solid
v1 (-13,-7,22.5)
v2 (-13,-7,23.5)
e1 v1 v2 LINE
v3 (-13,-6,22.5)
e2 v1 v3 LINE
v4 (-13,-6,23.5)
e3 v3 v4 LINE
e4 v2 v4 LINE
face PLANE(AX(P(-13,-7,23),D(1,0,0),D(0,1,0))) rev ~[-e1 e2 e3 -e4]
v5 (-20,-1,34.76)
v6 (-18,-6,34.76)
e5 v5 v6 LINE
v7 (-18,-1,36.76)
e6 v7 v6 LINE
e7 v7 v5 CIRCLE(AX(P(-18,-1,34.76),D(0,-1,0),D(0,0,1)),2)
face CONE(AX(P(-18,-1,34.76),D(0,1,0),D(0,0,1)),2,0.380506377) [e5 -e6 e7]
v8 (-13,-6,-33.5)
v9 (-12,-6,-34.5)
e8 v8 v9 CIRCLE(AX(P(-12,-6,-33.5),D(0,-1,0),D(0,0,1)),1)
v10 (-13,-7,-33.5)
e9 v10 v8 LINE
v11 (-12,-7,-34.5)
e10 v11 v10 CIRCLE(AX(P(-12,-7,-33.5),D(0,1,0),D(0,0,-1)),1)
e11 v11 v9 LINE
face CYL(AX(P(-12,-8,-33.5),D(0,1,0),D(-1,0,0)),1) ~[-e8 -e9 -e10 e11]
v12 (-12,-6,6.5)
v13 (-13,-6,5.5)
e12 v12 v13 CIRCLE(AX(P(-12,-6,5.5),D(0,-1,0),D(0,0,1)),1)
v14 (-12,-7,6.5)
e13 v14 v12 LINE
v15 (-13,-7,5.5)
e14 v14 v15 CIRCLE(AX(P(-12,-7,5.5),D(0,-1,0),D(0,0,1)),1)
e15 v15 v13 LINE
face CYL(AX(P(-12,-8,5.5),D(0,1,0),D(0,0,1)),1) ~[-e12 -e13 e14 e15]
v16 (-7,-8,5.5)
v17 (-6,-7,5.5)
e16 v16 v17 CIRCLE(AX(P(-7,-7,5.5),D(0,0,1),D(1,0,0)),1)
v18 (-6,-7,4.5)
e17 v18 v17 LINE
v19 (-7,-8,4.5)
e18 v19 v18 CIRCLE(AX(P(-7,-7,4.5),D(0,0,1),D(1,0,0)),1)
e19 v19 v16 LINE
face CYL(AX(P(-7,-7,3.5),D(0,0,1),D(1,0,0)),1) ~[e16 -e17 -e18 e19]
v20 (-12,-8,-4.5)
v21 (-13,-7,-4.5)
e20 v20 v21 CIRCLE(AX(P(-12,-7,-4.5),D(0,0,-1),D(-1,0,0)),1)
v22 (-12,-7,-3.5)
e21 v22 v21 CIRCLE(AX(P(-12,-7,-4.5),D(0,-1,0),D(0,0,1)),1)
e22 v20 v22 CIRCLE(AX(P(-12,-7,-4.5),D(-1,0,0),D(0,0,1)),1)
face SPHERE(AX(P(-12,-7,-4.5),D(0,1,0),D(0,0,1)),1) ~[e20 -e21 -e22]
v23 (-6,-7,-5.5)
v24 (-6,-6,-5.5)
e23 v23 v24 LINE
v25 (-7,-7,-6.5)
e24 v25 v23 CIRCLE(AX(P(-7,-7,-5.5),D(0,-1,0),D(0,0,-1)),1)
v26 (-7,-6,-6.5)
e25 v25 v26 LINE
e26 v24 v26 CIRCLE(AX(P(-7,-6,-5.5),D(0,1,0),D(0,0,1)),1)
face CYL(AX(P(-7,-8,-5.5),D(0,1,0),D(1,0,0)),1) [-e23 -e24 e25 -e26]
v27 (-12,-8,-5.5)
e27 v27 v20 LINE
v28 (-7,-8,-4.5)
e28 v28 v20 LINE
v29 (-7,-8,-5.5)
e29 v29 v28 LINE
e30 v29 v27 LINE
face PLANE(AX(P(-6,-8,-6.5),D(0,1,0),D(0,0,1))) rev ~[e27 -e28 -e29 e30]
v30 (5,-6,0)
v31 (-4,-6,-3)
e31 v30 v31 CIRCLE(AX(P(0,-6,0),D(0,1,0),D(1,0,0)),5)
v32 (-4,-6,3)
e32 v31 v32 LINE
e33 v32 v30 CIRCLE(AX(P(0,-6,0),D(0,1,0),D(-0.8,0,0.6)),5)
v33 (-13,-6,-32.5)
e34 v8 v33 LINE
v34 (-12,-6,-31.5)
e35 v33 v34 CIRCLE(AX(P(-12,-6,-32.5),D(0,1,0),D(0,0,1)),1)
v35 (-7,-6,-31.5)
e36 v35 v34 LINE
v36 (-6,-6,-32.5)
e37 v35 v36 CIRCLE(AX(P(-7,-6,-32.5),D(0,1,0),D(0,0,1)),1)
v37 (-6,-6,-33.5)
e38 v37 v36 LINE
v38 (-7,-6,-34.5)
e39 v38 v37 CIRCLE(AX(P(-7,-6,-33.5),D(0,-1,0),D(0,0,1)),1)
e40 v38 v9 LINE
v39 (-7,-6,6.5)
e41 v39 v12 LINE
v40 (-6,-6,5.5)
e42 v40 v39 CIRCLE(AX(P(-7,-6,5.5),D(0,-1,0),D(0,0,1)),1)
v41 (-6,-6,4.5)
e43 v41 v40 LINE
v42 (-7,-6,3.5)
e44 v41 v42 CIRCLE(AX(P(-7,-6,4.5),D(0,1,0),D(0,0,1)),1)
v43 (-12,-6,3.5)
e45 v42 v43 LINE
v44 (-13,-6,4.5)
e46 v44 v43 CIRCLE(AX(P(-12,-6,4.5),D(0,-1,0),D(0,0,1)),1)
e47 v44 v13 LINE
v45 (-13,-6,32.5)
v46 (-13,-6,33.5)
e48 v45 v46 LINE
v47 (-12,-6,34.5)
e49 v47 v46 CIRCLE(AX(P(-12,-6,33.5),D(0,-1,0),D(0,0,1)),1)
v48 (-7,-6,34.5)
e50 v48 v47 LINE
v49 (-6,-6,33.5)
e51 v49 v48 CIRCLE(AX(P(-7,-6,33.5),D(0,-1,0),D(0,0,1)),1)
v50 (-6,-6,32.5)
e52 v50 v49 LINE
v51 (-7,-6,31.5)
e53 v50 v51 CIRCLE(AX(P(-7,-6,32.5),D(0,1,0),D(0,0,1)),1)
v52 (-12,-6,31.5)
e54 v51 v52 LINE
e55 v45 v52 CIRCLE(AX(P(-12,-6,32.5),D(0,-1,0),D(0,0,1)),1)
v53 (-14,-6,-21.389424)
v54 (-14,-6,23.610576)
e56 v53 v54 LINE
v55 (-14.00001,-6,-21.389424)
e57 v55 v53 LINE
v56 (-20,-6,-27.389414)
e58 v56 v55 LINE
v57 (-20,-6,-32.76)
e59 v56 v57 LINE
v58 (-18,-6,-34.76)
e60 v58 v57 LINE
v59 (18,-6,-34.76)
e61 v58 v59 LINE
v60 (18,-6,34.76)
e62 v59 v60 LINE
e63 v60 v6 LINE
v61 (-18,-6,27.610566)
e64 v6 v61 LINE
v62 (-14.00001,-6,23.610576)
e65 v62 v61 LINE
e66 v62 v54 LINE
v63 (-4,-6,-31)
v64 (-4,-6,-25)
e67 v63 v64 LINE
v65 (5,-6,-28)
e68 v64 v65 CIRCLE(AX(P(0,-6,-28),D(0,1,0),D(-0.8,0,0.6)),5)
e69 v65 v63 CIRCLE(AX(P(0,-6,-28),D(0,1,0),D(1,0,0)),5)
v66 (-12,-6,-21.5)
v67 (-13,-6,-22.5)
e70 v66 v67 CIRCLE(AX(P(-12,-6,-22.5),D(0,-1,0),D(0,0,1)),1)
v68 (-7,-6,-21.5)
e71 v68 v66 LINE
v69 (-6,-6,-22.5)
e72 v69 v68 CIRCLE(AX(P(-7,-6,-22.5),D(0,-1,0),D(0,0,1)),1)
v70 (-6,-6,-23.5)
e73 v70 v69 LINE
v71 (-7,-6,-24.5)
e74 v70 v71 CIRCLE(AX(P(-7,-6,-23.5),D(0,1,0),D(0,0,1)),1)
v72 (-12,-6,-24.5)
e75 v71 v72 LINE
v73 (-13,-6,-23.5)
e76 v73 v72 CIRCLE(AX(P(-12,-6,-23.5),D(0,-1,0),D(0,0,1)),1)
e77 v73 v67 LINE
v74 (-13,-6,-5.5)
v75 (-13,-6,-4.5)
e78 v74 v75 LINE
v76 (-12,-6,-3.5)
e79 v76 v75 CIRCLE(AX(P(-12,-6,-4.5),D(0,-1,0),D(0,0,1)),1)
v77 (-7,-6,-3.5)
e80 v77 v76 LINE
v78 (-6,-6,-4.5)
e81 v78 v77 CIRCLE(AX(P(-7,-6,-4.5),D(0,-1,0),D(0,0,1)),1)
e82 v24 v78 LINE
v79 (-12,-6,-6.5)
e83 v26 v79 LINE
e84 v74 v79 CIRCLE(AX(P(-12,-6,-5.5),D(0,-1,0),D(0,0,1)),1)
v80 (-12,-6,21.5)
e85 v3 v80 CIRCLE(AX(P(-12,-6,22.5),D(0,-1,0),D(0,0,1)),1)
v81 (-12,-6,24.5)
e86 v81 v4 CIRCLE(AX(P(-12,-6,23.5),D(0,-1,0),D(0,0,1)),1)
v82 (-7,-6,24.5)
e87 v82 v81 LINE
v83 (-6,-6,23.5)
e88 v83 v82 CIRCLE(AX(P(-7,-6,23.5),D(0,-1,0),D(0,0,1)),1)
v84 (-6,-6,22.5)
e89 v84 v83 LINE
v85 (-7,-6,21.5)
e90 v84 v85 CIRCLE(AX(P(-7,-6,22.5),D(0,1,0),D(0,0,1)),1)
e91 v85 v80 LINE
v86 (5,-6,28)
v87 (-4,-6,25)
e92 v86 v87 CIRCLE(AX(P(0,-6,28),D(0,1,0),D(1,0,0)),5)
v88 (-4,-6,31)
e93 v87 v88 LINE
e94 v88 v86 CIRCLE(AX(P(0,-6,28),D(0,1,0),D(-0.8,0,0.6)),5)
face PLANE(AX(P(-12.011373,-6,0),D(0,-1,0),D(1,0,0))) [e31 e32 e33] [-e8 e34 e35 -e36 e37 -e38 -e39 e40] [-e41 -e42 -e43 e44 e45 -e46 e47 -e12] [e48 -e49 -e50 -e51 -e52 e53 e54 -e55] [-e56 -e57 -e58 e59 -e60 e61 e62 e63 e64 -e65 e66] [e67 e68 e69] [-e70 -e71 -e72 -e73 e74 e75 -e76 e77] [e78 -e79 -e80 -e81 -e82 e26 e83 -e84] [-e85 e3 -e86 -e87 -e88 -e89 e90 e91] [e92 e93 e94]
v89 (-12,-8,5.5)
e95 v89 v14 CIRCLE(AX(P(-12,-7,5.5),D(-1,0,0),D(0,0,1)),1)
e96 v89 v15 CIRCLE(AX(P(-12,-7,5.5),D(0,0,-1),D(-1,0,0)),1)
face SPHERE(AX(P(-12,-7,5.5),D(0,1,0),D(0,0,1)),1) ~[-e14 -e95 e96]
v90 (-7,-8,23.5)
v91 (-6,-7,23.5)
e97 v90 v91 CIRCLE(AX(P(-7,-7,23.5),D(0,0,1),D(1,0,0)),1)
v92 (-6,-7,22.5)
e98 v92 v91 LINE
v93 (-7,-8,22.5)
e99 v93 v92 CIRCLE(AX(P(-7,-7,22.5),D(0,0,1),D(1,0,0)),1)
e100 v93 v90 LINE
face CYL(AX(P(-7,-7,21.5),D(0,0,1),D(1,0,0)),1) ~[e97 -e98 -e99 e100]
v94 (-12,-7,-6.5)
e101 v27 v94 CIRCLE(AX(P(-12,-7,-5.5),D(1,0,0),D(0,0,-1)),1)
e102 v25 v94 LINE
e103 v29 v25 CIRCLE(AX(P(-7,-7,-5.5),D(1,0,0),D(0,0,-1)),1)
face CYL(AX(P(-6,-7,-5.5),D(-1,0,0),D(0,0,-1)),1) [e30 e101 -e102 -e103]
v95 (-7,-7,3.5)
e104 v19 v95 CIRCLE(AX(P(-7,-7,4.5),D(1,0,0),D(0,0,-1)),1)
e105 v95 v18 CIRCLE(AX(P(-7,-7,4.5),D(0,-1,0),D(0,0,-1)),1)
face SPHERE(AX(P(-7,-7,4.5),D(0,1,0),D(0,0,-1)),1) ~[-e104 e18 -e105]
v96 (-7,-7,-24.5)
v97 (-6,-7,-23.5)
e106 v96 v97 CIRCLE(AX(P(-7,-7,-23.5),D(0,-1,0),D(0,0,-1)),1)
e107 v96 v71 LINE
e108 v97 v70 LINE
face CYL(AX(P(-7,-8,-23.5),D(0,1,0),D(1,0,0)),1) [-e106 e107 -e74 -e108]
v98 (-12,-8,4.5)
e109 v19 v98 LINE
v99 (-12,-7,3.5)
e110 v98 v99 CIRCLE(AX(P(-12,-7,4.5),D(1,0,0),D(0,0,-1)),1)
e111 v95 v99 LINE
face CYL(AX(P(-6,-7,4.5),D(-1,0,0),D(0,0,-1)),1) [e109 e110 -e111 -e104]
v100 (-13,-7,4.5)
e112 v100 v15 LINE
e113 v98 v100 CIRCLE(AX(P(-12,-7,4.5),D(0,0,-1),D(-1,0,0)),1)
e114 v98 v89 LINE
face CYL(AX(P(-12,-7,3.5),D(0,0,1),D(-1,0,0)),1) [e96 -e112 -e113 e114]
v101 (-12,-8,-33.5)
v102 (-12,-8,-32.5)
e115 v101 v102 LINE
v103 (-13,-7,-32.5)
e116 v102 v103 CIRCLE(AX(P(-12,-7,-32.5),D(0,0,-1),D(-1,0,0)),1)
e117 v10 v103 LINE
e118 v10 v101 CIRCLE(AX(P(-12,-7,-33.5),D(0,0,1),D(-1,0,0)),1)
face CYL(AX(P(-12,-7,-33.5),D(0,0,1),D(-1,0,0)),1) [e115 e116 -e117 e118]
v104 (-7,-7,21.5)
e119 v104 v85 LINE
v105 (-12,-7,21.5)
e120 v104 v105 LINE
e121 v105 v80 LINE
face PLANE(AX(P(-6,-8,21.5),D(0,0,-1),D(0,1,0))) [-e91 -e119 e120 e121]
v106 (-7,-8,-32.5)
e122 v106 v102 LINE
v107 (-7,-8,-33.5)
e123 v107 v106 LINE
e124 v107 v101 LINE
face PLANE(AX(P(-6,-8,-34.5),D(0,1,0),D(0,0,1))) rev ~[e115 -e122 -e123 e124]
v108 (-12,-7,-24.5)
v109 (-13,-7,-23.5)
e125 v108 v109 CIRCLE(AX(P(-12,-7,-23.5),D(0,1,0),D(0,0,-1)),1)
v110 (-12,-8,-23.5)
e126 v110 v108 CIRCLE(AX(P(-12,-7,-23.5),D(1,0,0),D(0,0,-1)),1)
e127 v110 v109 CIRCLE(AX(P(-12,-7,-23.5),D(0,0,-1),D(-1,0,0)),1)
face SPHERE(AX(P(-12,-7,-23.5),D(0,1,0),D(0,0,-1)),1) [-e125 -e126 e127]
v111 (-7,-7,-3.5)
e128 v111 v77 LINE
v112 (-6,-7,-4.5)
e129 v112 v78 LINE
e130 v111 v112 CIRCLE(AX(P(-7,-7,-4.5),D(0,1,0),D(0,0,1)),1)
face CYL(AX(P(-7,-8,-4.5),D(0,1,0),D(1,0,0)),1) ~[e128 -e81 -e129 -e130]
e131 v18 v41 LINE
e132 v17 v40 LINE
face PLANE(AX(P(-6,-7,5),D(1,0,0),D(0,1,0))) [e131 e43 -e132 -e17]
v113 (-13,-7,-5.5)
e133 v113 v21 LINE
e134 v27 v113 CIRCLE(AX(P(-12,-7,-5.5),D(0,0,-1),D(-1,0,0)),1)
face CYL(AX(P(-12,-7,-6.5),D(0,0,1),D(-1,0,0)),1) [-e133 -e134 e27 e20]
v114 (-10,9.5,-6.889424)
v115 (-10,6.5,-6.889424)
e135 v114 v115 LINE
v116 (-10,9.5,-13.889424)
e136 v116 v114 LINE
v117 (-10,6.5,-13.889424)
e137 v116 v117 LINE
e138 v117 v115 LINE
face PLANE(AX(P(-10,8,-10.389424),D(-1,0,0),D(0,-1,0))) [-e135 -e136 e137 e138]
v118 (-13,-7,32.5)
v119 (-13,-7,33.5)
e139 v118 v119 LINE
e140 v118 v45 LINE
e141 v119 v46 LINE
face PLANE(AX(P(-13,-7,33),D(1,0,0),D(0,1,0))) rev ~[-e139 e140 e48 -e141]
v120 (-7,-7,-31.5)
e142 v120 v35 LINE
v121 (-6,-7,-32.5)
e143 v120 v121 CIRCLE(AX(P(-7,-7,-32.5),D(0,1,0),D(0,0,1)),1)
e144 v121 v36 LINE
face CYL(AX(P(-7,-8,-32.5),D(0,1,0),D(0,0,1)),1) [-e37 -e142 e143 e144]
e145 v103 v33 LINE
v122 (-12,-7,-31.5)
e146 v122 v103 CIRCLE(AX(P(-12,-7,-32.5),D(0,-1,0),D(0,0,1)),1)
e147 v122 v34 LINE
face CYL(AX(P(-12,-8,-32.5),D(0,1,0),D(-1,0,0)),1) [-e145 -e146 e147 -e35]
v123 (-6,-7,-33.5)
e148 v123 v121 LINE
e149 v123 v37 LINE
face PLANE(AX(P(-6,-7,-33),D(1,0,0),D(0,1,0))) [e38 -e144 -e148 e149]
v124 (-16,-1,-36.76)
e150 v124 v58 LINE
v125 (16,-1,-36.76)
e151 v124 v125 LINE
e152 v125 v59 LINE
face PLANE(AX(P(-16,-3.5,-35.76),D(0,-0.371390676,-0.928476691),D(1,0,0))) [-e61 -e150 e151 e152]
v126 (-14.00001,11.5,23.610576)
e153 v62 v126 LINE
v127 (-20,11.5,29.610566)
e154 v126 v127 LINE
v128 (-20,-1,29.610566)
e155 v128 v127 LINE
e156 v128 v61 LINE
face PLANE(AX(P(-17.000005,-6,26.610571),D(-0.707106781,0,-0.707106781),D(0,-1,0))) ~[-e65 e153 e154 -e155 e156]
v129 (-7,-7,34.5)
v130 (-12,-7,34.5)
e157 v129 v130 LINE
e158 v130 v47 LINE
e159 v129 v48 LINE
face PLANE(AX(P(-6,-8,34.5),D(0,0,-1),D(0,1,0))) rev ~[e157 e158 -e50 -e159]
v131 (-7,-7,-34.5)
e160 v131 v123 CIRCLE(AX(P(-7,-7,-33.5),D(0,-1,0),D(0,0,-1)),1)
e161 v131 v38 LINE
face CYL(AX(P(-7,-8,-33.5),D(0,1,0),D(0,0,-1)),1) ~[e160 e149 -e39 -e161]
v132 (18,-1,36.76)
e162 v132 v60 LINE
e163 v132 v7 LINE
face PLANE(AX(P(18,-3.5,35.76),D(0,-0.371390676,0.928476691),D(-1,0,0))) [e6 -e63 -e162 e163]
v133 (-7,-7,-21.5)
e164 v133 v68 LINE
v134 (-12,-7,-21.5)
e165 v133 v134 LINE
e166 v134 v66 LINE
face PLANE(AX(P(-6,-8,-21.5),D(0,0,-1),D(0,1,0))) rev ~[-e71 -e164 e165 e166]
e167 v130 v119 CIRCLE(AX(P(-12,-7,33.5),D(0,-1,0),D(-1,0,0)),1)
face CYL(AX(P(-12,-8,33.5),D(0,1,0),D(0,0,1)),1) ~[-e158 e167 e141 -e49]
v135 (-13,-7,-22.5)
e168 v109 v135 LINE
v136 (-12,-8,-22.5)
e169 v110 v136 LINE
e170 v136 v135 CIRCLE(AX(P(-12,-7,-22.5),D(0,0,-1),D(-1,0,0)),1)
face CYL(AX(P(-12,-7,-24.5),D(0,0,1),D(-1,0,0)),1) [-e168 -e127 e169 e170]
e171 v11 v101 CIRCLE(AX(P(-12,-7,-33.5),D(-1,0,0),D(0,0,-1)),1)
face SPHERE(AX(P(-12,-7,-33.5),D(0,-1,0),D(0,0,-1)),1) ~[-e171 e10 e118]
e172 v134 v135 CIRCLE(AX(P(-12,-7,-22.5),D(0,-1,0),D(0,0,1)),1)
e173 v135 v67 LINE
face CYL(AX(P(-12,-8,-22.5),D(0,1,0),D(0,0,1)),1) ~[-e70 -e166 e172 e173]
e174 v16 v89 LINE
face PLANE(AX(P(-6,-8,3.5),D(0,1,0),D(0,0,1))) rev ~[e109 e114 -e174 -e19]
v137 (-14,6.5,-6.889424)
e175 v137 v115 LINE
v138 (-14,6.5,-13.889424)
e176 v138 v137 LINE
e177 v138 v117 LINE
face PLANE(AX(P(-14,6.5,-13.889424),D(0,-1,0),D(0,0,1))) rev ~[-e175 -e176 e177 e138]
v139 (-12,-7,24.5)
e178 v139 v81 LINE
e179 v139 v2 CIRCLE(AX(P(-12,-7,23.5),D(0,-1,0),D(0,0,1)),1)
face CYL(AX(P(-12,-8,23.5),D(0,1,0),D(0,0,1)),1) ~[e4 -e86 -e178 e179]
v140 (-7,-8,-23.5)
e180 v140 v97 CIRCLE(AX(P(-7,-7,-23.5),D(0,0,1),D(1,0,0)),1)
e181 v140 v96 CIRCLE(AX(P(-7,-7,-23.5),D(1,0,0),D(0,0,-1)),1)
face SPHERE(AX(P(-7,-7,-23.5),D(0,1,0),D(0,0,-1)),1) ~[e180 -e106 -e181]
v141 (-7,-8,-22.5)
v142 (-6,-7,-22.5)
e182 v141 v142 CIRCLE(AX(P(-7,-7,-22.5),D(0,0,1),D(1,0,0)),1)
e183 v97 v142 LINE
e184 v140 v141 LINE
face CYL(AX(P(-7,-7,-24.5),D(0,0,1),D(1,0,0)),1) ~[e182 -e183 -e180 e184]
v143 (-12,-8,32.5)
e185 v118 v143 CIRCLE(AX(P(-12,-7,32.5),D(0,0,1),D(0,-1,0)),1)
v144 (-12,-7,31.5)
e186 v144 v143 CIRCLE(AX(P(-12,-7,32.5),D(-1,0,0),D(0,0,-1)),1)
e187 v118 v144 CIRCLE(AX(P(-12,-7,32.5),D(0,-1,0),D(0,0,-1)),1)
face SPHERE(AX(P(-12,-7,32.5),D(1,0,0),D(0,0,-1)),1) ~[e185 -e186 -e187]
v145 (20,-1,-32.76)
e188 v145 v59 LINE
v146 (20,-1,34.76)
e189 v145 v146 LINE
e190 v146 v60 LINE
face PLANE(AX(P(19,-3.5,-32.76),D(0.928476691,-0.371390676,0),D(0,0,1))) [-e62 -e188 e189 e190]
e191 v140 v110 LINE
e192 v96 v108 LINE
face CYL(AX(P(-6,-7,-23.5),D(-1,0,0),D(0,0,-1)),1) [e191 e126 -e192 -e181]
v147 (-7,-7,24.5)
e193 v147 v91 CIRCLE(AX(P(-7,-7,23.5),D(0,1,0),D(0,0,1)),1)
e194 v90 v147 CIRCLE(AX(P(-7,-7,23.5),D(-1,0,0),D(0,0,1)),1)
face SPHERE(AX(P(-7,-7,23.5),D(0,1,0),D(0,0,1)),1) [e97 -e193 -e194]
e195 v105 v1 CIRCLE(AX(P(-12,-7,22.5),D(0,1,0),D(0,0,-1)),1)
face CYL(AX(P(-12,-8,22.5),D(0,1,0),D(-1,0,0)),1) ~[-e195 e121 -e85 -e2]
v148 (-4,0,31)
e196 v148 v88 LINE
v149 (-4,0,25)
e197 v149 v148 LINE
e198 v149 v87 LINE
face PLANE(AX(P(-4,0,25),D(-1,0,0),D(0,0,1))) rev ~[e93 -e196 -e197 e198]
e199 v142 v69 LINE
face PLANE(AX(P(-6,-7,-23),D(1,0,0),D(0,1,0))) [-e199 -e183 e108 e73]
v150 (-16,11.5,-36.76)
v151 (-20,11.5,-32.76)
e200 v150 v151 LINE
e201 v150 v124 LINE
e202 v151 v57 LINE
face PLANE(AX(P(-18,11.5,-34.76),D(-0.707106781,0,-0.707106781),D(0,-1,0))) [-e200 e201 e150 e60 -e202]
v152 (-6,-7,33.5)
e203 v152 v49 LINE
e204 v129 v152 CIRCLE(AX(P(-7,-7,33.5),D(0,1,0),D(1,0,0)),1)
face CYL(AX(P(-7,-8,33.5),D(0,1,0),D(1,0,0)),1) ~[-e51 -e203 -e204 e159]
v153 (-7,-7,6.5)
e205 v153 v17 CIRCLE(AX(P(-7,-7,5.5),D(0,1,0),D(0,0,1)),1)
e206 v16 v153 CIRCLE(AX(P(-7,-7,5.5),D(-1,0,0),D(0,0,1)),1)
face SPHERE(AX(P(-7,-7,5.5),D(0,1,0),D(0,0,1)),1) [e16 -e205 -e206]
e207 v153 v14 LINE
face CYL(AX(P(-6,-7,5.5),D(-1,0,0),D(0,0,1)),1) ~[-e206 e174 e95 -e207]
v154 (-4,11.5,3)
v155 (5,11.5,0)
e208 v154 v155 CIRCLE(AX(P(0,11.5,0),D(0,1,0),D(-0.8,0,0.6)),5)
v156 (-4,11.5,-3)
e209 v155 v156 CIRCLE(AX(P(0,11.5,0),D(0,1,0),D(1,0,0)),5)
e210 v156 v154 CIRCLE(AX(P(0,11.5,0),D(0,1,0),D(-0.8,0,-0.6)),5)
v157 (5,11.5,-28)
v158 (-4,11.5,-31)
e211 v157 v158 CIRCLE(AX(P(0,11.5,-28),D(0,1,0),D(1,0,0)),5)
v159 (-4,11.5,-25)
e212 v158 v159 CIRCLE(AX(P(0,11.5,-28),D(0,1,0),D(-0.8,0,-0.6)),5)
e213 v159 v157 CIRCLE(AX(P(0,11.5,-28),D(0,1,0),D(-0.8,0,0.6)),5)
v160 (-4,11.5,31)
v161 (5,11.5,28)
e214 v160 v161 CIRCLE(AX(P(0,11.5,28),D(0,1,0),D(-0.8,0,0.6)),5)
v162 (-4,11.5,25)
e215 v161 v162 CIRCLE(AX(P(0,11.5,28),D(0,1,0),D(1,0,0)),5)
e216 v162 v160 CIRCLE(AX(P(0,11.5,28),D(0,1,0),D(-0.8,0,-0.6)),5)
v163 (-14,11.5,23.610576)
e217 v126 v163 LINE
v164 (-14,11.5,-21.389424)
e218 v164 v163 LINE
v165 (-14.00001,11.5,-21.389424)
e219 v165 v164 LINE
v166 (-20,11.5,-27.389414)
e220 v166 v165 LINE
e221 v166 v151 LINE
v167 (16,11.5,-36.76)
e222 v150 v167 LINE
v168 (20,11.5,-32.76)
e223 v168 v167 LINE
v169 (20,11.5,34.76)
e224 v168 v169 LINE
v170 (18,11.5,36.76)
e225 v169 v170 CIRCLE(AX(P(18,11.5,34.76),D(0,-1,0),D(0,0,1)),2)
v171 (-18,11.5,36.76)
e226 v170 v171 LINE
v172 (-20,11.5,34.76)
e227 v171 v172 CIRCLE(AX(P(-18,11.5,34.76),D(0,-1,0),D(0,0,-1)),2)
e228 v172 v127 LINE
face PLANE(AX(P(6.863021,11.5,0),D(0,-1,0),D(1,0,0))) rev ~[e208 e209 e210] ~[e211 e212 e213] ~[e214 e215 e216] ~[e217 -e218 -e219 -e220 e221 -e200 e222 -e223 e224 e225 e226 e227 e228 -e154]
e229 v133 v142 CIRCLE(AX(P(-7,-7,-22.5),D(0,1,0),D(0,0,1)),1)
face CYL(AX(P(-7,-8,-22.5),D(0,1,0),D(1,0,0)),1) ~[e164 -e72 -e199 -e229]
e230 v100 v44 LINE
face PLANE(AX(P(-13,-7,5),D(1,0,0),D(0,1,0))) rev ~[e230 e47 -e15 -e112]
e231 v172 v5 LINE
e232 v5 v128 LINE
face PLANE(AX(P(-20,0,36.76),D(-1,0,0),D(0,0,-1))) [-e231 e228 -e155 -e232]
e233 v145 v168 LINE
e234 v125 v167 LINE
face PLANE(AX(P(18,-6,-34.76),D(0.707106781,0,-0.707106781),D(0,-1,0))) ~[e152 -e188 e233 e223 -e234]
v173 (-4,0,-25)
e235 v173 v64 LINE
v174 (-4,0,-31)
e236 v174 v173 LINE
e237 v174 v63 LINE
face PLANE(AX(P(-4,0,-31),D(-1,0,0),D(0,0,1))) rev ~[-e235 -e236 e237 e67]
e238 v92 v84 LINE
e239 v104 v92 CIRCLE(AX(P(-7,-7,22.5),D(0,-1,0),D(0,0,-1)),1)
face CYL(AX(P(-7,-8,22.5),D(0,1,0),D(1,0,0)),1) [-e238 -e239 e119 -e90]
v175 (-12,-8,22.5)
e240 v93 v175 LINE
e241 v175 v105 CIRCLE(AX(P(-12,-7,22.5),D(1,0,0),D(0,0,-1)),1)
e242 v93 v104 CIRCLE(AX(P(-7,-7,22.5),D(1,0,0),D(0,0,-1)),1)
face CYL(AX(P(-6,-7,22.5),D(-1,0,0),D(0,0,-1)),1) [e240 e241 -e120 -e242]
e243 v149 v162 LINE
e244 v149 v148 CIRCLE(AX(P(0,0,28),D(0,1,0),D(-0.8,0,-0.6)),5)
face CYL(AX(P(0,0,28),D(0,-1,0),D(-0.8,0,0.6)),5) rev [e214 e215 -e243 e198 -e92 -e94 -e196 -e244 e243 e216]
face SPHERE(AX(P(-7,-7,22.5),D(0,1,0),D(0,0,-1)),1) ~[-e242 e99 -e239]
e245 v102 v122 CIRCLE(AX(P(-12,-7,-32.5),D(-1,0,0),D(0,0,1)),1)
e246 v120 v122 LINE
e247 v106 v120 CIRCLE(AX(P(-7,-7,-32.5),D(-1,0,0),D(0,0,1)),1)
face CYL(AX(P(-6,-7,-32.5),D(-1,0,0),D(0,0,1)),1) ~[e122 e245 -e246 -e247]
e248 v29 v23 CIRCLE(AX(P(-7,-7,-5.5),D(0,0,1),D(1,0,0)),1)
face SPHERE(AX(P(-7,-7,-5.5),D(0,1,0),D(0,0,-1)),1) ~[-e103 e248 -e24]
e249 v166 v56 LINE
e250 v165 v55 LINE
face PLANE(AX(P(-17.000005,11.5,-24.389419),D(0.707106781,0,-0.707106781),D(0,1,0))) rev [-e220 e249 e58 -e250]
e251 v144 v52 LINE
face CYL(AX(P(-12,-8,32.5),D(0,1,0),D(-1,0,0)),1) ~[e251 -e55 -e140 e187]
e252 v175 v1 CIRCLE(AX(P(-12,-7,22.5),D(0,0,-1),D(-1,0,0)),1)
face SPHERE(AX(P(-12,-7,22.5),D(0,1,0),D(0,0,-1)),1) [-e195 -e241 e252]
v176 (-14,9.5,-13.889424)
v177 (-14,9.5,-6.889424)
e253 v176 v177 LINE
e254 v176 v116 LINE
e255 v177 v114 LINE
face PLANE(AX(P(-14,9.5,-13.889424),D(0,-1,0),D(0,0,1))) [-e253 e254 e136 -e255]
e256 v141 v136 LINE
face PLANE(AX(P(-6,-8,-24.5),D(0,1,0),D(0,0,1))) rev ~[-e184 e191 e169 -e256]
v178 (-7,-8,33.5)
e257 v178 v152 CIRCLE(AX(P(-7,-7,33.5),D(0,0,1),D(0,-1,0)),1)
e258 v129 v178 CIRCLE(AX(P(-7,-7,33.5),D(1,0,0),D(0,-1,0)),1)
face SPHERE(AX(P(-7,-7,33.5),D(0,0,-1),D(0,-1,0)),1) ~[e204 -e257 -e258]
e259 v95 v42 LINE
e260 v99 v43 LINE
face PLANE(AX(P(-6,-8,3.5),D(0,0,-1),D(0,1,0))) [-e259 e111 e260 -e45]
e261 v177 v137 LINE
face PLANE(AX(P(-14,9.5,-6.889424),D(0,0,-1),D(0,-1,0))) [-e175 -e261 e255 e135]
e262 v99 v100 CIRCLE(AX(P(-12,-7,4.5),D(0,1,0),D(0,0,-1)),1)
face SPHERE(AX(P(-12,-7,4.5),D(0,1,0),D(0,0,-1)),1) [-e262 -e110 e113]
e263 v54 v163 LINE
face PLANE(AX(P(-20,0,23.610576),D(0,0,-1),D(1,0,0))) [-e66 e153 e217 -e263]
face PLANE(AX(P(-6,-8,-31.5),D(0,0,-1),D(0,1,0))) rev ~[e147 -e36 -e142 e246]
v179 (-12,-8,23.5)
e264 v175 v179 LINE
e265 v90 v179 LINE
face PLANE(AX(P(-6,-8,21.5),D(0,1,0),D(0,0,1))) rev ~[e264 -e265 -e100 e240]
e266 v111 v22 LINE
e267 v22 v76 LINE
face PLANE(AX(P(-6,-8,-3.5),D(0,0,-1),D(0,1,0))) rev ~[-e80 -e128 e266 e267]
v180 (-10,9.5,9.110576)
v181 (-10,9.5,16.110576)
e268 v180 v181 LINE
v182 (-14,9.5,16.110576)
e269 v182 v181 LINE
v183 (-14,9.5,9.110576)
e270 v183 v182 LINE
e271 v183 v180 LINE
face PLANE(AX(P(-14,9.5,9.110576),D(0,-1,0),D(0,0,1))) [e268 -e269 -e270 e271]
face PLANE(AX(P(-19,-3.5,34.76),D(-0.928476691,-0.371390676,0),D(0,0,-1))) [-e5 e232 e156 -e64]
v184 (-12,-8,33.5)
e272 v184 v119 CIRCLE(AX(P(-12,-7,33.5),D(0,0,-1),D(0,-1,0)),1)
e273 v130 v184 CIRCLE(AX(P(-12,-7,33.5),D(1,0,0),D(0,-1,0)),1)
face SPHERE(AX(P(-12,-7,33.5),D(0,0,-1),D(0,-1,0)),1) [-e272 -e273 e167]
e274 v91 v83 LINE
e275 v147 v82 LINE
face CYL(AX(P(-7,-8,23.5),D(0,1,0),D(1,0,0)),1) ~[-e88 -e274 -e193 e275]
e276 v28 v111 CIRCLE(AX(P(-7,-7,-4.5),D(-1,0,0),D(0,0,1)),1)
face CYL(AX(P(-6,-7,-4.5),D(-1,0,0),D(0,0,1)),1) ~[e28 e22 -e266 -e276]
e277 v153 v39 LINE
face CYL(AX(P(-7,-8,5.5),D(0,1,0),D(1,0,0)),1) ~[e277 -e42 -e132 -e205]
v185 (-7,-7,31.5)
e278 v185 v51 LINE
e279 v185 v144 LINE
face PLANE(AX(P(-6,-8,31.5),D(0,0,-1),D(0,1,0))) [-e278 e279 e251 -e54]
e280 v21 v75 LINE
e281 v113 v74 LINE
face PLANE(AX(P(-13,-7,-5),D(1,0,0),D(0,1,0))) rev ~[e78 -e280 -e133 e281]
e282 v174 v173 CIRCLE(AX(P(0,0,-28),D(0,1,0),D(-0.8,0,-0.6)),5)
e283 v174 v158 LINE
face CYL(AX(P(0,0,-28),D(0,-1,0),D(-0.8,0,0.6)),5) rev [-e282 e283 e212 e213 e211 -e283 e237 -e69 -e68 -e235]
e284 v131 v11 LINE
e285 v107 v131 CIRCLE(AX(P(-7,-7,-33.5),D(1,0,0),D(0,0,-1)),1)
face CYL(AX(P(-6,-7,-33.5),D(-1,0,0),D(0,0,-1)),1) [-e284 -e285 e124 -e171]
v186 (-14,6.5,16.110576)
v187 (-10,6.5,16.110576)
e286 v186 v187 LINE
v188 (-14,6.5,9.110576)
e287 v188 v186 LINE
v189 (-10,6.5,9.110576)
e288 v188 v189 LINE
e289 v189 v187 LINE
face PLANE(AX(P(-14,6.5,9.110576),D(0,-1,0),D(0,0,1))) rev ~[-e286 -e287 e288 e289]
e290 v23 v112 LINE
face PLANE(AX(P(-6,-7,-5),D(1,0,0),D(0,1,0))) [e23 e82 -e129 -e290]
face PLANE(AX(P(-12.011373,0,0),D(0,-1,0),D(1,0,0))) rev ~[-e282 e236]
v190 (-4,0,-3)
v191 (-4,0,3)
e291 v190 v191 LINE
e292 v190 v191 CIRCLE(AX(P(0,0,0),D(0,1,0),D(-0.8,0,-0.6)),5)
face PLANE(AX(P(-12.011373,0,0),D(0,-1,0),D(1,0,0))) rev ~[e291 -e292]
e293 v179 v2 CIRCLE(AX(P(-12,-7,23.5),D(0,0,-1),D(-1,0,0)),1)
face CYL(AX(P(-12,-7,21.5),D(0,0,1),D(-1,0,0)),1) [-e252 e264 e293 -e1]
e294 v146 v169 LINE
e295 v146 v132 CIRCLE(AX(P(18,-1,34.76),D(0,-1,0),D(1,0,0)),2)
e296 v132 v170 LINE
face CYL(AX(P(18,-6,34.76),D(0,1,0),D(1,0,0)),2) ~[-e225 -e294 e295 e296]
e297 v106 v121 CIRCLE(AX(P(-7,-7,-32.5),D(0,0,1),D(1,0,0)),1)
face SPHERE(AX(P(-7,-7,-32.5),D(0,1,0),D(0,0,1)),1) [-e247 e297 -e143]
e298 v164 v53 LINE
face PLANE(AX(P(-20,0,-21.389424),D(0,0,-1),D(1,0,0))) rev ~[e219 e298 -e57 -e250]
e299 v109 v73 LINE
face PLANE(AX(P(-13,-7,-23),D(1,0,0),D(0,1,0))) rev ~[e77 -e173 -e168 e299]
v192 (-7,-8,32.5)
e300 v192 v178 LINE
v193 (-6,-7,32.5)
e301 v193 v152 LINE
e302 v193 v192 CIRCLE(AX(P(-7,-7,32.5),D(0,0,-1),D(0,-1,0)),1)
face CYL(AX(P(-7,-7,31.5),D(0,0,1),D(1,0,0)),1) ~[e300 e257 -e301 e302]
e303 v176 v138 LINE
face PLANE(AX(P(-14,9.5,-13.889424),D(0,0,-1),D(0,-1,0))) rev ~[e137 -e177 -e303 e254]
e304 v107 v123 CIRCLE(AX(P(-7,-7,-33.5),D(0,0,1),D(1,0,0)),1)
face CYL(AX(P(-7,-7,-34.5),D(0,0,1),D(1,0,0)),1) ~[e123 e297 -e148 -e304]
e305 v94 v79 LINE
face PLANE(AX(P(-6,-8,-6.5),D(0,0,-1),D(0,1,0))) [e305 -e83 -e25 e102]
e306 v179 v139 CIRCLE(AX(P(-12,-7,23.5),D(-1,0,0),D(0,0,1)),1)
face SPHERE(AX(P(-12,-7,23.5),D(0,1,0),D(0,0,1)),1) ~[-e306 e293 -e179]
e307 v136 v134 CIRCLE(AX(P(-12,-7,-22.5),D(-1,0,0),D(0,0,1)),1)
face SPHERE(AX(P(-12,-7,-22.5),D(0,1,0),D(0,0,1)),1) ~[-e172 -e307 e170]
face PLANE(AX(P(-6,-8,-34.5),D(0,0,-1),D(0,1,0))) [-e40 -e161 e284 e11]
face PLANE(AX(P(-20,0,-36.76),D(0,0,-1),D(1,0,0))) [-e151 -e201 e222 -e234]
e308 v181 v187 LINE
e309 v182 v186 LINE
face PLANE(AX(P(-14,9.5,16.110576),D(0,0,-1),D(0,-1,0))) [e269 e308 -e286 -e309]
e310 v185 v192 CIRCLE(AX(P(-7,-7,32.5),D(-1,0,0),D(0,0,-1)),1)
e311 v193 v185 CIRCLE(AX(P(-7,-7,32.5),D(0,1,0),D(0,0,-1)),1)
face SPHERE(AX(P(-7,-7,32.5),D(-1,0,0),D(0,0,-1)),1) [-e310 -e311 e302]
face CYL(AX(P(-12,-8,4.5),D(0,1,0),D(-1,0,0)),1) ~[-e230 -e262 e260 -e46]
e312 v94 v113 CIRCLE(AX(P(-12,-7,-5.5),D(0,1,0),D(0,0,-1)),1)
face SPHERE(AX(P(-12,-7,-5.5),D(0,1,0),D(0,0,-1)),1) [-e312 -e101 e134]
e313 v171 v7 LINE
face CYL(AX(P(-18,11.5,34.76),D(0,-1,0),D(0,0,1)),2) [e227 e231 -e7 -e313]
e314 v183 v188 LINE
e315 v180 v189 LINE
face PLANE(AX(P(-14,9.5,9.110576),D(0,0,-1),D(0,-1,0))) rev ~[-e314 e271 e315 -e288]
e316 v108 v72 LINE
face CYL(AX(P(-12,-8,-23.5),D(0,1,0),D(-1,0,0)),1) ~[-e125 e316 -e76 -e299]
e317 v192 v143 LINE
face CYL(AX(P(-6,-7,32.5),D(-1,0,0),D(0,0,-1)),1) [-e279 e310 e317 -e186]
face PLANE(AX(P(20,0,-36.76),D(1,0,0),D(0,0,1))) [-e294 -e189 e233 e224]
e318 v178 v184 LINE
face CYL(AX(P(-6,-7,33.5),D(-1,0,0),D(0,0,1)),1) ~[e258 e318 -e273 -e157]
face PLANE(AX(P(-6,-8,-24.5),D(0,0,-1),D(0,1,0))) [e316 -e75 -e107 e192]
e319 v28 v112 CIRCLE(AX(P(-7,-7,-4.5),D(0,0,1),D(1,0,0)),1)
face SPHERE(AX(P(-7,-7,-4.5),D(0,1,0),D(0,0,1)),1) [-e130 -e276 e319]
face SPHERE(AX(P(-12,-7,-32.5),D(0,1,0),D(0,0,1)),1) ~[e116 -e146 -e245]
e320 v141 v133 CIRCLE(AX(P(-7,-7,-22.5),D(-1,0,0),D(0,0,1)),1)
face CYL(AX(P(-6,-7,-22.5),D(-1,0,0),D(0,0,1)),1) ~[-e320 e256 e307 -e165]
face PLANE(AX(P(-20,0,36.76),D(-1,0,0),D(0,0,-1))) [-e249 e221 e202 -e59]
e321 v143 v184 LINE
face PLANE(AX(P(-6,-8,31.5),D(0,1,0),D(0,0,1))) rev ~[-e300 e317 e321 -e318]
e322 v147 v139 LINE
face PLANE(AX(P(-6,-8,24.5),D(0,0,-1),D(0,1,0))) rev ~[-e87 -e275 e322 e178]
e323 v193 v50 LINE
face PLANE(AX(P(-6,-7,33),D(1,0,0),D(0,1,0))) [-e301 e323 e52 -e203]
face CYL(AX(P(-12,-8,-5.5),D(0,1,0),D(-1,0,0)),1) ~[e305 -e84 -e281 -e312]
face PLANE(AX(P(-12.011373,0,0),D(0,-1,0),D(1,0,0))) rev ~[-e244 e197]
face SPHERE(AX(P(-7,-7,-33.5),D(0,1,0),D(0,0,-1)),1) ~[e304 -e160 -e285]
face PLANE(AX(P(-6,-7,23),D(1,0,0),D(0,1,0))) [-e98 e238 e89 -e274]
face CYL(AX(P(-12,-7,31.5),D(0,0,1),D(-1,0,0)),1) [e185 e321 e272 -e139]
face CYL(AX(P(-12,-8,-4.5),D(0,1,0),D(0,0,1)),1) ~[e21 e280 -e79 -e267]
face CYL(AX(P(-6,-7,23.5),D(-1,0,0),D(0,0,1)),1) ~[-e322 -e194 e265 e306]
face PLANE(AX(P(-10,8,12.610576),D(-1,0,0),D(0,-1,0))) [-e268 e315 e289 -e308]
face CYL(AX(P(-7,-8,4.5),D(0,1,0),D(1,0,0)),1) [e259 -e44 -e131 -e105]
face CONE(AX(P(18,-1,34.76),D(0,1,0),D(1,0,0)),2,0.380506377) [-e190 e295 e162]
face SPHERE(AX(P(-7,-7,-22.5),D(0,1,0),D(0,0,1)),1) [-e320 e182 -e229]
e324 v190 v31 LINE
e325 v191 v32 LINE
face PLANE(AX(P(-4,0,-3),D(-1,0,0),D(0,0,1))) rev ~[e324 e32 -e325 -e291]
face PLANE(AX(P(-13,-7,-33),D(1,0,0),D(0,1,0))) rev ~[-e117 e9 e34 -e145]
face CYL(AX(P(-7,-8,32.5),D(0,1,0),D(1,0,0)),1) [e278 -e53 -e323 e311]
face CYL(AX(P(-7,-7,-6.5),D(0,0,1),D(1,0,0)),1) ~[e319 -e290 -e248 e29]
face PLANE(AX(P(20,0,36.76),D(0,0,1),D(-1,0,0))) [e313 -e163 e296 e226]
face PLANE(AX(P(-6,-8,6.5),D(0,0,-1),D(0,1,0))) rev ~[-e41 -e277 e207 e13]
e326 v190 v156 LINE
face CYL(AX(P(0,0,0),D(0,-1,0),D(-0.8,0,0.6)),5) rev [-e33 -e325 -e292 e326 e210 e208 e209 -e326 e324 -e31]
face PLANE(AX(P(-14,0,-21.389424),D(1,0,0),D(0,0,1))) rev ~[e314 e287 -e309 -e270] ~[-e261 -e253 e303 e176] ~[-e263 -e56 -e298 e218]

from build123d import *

# Parameters (mm, degrees)
F1_DEPTH    = 6
F2_DEPTH    = 11.5
F3_SIZE     = 4
F4_W        = 6
F4_H        = 45
F5_DEPTH    = 25
F6_SIZE     = 5.99999
F8_START    = -6
F7_W        = 2
F7_H        = 3
F8_DEPTH    = 7
F9_R        = 1
F10_R       = 1
F11_R       = 2
F12_SIZE2   = 2
F12_SIZE    = 5
F12_2_SIZE2 = 2
F12_2_SIZE  = 5
F13_W       = 3
F13_H       = 7
F14_DEPTH   = 4


# Not quite as in the source:
# - a fillet or chamfer is up to 0.001 mm smaller than in the source, because OpenCascade refuses the exact size


with BuildPart() as f1:
    # F0 (on Front) → F1 (new body)
    with BuildSketch(Plane.XZ):
        with BuildLine():
            Line((-4, 36.76), (-20, 36.76))
            Line((-20, 36.76), (-20, -36.76))
            Line((-20, -36.76), (-4, -36.76))
            Line((-4, -36.76), (-4, -31))
            ThreePointArc((-4, -31), (-5, -28), (-4, -25))
            Line((-4, -25), (-4, -3))
            ThreePointArc((-4, -3), (-5, 0), (-4, 3))
            Line((-4, 3), (-4, 25))
            ThreePointArc((-4, 25), (-5, 28), (-4, 31))
            Line((-4, 31), (-4, 36.76))
        make_face()
        with BuildLine():
            Line((20, 36.76), (-4, 36.76))
            Line((-4, 36.76), (-4, 31))
            ThreePointArc((-4, 31), (1.5811388301, 32.7434164903), (5, 28))
            ThreePointArc((5, 28), (1.5811388301, 23.2565835097), (-4, 25))
            Line((-4, 25), (-4, 3))
            ThreePointArc((-4, 3), (1.5811388301, 4.7434164903), (5, 0))
            ThreePointArc((5, 0), (1.5811388301, -4.7434164903), (-4, -3))
            Line((-4, -3), (-4, -25))
            ThreePointArc((-4, -25), (1.5811388301, -23.2565835097), (5, -28))
            ThreePointArc((5, -28), (1.5811388301, -32.7434164903), (-4, -31))
            Line((-4, -31), (-4, -36.76))
            Line((-4, -36.76), (20, -36.76))
            Line((20, -36.76), (20, 36.76))
        make_face()
        with BuildLine():
            Line((-4, 25), (-4, 31))
            ThreePointArc((-4, 31), (-5, 28), (-4, 25))
        make_face()
        with BuildLine():
            Line((-4, -3), (-4, 3))
            ThreePointArc((-4, 3), (-5, 0), (-4, -3))
        make_face()
        with BuildLine():
            ThreePointArc((-4, -25), (-5, -28), (-4, -31))
            Line((-4, -31), (-4, -25))
        make_face()
    extrude(amount=F1_DEPTH)

    # F0 (on Front) → F2 (join)
    with BuildSketch(Plane.XZ):
        with BuildLine():
            Line((20, 36.76), (-4, 36.76))
            Line((-4, 36.76), (-4, 31))
            ThreePointArc((-4, 31), (1.5811388301, 32.7434164903), (5, 28))
            ThreePointArc((5, 28), (1.5811388301, 23.2565835097), (-4, 25))
            Line((-4, 25), (-4, 3))
            ThreePointArc((-4, 3), (1.5811388301, 4.7434164903), (5, 0))
            ThreePointArc((5, 0), (1.5811388301, -4.7434164903), (-4, -3))
            Line((-4, -3), (-4, -25))
            ThreePointArc((-4, -25), (1.5811388301, -23.2565835097), (5, -28))
            ThreePointArc((5, -28), (1.5811388301, -32.7434164903), (-4, -31))
            Line((-4, -31), (-4, -36.76))
            Line((-4, -36.76), (20, -36.76))
            Line((20, -36.76), (20, 36.76))
        make_face()
        with BuildLine():
            Line((-4, 36.76), (-20, 36.76))
            Line((-20, 36.76), (-20, -36.76))
            Line((-20, -36.76), (-4, -36.76))
            Line((-4, -36.76), (-4, -31))
            ThreePointArc((-4, -31), (-5, -28), (-4, -25))
            Line((-4, -25), (-4, -3))
            ThreePointArc((-4, -3), (-5, 0), (-4, 3))
            Line((-4, 3), (-4, 25))
            ThreePointArc((-4, 25), (-5, 28), (-4, 31))
            Line((-4, 31), (-4, 36.76))
        make_face()
    extrude(amount=-F2_DEPTH)

    # F3
    f3_edges = [f1.edges().sort_by_distance(p)[0] for p in [
        (20, 2.75, -36.76),
        (-20, 2.75, -36.76),
    ]]
    chamfer(f3_edges, length=F3_SIZE)

    # F4 (on Front) → F5 (cut, symmetric)
    with BuildSketch(Plane.XZ):
        with Locations((-17, 1.1105760932)):
            Rectangle(F4_W, F4_H)
    extrude(amount=F5_DEPTH, both=True, mode=Mode.SUBTRACT)

    # F6 (size 6 in the source; OpenCascade refuses exactly that, so slightly less here)
    f6_edges = [f1.edges().sort_by_distance(p)[0] for p in [
        (-20, 2.75, 23.610576),
        (-20, 2.75, -21.389424),
    ]]
    chamfer(f6_edges, length=F6_SIZE)

    # F7 (on Right) → F8 (join)
    with BuildSketch(Plane.YZ.offset(F8_START)):
        with Locations((-7, 33)):
            Rectangle(F7_W, F7_H)
        with Locations((-7, 23)):
            Rectangle(F7_W, F7_H)
        with Locations((-7, 5)):
            Rectangle(F7_W, F7_H)
        with Locations((-7, -5)):
            Rectangle(F7_W, F7_H)
        with Locations((-7, -23)):
            Rectangle(F7_W, F7_H)
        with Locations((-7, -33)):
            Rectangle(F7_W, F7_H)
    extrude(amount=-F8_DEPTH)

    # F9
    f9_edges = [f1.edges().sort_by_distance(p)[0] for p in [
        (-13, -7, -34.5),
    ]]
    fillet(f9_edges, radius=F9_R)

    # F10
    f10_edges = [f1.edges().sort_by_distance(p)[0] for p in [
        (-6, -7, -34.5),
        (-13, -7, -31.5),
        (-6, -7, -31.5),
        (-9.5, -8, -31.5),
        (-9, -8, -34.5),
        (-6, -8, -33),
        (-6, -7, -24.5),
        (-13, -7, -24.5),
        (-13, -7, -21.5),
        (-6, -7, -21.5),
        (-9.5, -8, -21.5),
        (-9.5, -8, -24.5),
        (-6, -8, -23),
        (-13, -8, -23),
        (-6, -7, -6.5),
        (-13, -7, -6.5),
        (-13, -7, -3.5),
        (-6, -7, -3.5),
        (-9.5, -8, -6.5),
        (-9.5, -8, -3.5),
        (-6, -8, -5),
        (-13, -8, -5),
        (-13, -7, 3.5),
        (-6, -7, 3.5),
        (-6, -7, 6.5),
        (-13, -7, 6.5),
        (-9.5, -8, 6.5),
        (-9.5, -8, 3.5),
        (-13, -8, 5),
        (-6, -8, 5),
        (-13, -7, 21.5),
        (-6, -7, 21.5),
        (-6, -7, 24.5),
        (-13, -7, 24.5),
        (-9.5, -8, 24.5),
        (-9.5, -8, 21.5),
        (-6, -8, 23),
        (-13, -8, 23),
        (-9.5, -8, 31.5),
        (-13, -7, 31.5),
        (-6, -7, 31.5),
        (-6, -8, 33),
        (-13, -8, 33),
        (-9.5, -8, 34.5),
        (-13, -7, 34.5),
        (-6, -7, 34.5),
    ]]
    fillet(f10_edges, radius=F10_R)

    # F11
    f11_edges = [f1.edges().sort_by_distance(p)[0] for p in [
        (-20, 2.75, 36.76),
        (20, 2.75, 36.76),
    ]]
    fillet(f11_edges, radius=F11_R)

    # F12
    f12_edges = [f1.edges().sort_by_distance(p)[0] for p in [
        (20, -6, 1),
    ]]
    f12_side = f1.faces().sort_by_distance((20, 2.75, 1))[0]
    chamfer(f12_edges, length=F12_SIZE, length2=F12_SIZE2, reference=f12_side)

    # F12#2
    f12_2_edges = [f1.edges().sort_by_distance(p)[0] for p in [
        (0, -6, -36.76),
    ]]
    f12_2_side = f1.faces().sort_by_distance((0, 2.75, -36.76))[0]
    chamfer(f12_2_edges, length=F12_2_SIZE, length2=F12_2_SIZE2, reference=f12_2_side)

    # F13 (on face) → F14 (cut)
    with BuildSketch(Plane(origin=(-14, 0, 0), x_dir=(0, -1, 0), z_dir=(-1, 0, 0))):
        with Locations((-8, 12.6105760932)):
            Rectangle(F13_W, F13_H)
        with Locations((-8, -10.3894239068)):
            Rectangle(F13_W, F13_H)
    extrude(amount=-F14_DEPTH, mode=Mode.SUBTRACT)


solid = f1.part
